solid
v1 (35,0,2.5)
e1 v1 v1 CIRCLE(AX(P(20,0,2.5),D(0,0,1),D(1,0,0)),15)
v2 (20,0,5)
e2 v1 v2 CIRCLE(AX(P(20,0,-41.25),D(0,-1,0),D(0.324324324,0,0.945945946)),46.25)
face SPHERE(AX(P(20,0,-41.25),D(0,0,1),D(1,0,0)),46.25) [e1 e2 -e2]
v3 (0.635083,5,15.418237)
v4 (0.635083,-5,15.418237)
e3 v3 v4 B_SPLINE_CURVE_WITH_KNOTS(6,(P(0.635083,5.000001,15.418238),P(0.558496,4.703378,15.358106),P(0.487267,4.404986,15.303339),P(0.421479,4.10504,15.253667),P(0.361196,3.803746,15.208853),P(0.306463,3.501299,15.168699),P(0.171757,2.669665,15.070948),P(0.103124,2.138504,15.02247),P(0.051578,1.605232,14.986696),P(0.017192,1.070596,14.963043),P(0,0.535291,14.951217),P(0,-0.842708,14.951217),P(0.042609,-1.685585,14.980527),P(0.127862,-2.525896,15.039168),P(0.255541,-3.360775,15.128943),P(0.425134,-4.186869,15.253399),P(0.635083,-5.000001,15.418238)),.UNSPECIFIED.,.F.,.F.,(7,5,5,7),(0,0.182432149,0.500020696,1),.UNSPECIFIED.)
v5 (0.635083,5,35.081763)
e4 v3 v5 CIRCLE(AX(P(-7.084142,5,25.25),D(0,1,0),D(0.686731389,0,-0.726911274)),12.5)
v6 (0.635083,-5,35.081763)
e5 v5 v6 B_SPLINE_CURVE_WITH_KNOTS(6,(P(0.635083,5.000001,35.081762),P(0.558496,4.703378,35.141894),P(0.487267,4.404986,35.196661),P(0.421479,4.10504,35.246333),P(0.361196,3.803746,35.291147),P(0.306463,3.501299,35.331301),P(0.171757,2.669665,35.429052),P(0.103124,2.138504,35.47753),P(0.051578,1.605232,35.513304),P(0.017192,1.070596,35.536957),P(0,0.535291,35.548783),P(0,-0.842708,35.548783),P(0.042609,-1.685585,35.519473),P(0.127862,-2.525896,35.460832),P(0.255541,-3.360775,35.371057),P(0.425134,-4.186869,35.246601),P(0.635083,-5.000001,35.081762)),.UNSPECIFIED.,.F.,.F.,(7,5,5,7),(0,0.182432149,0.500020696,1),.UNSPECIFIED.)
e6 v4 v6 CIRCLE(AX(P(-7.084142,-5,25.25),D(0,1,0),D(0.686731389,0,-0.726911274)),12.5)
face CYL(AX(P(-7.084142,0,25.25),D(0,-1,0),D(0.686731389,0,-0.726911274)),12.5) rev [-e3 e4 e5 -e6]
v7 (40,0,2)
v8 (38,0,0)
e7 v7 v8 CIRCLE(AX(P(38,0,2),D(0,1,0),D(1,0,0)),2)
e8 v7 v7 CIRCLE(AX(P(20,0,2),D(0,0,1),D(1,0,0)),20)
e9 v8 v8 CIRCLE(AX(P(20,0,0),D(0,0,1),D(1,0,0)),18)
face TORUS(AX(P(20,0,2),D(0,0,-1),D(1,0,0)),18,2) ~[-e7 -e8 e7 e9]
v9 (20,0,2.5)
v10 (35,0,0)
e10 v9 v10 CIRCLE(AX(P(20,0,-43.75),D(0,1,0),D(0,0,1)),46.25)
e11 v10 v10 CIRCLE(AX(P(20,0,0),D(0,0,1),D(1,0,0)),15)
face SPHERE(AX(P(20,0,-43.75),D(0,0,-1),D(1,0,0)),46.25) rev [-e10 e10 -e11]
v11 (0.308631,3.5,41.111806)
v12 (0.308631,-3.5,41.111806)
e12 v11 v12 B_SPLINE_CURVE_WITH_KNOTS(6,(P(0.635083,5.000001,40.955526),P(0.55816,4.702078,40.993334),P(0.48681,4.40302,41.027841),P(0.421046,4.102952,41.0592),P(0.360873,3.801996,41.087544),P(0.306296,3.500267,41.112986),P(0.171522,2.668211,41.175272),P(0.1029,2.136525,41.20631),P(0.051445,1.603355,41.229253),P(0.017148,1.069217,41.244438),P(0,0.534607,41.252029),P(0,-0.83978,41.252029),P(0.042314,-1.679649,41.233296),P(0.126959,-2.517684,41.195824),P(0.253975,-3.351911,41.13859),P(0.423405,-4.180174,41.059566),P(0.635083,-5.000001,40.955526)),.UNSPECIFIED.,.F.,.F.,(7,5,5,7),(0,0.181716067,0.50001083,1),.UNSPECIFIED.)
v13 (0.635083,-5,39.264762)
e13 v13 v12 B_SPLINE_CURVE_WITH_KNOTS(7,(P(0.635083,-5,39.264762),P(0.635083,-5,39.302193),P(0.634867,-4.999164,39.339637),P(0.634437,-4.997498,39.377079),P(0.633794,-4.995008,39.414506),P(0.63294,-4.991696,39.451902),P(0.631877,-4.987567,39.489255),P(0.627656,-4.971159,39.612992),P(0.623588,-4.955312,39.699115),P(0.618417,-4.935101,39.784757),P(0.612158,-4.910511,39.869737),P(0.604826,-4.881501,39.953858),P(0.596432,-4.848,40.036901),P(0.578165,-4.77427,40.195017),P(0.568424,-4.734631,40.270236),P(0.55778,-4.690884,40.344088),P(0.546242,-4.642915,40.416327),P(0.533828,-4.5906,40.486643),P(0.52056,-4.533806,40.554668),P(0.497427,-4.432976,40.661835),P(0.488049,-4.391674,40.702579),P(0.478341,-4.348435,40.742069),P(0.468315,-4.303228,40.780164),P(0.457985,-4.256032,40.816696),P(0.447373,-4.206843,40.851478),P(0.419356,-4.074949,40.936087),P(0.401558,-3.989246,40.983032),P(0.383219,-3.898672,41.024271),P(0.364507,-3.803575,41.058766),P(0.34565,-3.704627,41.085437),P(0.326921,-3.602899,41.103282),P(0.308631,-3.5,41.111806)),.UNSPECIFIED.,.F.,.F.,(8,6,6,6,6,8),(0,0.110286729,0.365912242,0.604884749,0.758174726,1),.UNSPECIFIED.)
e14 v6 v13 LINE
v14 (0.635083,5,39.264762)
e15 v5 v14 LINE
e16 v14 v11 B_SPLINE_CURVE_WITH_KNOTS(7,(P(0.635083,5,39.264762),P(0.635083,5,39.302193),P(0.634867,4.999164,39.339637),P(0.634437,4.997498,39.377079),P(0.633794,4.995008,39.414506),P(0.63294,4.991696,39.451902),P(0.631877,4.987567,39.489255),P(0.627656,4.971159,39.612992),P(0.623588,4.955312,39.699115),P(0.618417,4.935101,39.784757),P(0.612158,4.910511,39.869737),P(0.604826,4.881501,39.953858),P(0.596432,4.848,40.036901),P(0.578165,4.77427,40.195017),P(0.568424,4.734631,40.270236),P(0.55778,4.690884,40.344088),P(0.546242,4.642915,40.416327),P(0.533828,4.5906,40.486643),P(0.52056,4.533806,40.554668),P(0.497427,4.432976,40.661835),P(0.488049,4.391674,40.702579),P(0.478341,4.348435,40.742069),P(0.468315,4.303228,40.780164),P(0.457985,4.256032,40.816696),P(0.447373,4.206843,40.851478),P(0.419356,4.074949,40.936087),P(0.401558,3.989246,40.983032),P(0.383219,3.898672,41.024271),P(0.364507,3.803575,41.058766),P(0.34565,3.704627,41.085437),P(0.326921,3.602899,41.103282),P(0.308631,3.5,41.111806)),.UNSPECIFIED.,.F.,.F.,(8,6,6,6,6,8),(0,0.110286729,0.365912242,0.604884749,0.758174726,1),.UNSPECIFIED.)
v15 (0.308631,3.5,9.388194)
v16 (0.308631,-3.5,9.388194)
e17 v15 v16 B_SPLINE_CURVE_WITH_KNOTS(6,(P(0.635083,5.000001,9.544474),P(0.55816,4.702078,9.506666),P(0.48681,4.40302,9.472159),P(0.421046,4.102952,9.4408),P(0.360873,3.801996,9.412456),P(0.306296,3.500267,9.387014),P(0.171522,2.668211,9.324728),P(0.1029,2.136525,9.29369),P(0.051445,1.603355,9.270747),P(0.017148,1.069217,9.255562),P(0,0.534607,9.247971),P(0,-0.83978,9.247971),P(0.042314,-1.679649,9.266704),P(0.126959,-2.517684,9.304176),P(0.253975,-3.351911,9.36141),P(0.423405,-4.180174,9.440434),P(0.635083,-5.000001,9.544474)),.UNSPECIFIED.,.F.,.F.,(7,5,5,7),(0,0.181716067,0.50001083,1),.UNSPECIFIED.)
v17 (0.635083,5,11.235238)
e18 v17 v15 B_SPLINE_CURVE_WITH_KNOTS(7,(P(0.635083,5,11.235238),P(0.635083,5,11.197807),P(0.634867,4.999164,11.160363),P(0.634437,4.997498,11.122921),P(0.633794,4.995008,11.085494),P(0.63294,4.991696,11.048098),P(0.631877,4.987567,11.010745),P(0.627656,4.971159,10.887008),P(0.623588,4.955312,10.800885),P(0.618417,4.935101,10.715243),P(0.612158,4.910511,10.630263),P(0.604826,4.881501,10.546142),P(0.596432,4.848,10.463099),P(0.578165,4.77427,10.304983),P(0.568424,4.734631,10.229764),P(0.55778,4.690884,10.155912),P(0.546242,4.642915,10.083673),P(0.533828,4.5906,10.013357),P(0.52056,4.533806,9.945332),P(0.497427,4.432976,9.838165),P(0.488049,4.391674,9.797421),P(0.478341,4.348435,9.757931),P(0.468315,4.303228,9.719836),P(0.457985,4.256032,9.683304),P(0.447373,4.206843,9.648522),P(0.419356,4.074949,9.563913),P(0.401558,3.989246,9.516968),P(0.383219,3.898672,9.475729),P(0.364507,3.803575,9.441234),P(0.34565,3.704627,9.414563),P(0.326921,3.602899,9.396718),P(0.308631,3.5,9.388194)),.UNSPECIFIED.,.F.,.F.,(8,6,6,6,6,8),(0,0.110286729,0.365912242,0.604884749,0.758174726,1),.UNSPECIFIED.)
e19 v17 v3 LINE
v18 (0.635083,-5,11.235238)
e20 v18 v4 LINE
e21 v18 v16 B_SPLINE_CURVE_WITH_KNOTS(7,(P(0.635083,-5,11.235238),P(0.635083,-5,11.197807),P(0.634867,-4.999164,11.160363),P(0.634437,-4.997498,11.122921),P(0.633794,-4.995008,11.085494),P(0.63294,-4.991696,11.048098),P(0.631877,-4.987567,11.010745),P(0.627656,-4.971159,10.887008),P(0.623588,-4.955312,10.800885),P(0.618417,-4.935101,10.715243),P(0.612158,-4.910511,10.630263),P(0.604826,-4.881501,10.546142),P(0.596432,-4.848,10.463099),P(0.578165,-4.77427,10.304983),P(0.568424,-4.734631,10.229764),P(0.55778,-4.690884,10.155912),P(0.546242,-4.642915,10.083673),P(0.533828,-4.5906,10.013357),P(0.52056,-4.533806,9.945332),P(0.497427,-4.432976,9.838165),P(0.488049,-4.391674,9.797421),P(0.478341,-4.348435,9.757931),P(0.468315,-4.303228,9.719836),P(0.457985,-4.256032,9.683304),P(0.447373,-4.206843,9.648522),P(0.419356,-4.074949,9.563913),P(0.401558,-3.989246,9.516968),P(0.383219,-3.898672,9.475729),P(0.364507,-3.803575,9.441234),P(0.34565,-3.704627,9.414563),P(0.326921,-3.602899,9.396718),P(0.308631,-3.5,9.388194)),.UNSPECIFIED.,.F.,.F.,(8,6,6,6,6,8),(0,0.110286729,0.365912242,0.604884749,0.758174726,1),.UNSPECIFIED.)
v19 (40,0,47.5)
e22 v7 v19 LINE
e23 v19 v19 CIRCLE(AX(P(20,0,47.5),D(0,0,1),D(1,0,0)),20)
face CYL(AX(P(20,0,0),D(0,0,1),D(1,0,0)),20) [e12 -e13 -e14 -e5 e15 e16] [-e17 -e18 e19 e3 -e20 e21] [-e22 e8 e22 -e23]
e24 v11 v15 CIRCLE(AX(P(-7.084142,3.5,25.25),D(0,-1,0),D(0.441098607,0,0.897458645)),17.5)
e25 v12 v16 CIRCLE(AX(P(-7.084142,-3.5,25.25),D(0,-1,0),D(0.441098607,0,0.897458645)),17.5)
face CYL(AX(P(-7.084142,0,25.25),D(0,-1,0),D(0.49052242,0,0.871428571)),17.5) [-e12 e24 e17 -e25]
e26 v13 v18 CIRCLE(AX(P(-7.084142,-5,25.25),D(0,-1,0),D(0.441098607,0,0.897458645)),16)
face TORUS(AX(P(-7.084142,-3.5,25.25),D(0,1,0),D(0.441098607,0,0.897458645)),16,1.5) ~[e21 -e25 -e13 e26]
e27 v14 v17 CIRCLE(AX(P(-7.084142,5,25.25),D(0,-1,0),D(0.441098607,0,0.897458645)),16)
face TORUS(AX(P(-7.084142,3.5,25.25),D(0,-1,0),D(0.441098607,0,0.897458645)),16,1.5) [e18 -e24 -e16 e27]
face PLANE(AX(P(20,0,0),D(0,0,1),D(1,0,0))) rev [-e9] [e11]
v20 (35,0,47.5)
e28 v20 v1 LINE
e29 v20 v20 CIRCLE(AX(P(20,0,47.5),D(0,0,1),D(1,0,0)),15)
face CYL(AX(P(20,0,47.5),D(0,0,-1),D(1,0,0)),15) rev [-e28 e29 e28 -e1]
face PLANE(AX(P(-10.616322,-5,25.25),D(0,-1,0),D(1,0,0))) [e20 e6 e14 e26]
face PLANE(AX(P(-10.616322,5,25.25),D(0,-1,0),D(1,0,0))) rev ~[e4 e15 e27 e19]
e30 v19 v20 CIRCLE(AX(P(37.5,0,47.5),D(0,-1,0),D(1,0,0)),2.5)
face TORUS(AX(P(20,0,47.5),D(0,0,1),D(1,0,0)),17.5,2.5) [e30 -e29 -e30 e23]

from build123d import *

# Parameters (mm, degrees)
F3_DEPTH = 5
F4_R     = 1.5
F5_R     = 2


# Not quite as in the source:
# - a feature names something its author has since deleted; it is built from what else it names


with BuildPart() as f1:
    # F0 (on Front) → F1 (revolve)
    with BuildSketch(Plane.XZ):
        Polygon((35, 0), (40, 0), (40, 47.5), (35, 47.5), (35, 2.5), align=None)
        with BuildLine():
            Line((35, 47.5), (40, 47.5))
            ThreePointArc((40, 47.5), (37.5, 50), (35, 47.5))
        make_face()
        with BuildLine():
            ThreePointArc((20, 2.5), (27.6034531629, 1.8707189772), (35, 0))
            Line((35, 0), (35, 2.5))
            ThreePointArc((35, 2.5), (27.6034531629, 4.3707189772), (20, 5))
            Line((20, 5), (20, 2.5))
        make_face()
    revolve(axis=Axis((20, 0, 1.25), (0, 0, 1)))

    # F2 (on Front) → F3 (join, symmetric)
    with BuildSketch(Plane.XZ):
        with BuildLine():
            ThreePointArc((1.5, 16.1636090773), (-19.5841423567, 25.25), (1.5, 34.3363909227))
            Line((1.5, 34.3363909227), (1.5, 40.5))
            ThreePointArc((1.5, 40.5), (-24.5841423567, 25.25), (1.5, 10))
            Line((1.5, 10), (1.5, 16.1636090773))
        make_face()
    extrude(amount=F3_DEPTH, both=True)

    # F4
    f4_edges = [f1.edges().sort_by_distance(p)[0] for p in [
        (-24.584142, 5, 25.25),
        (-24.584142, -5, 25.25),
    ]]
    fillet(f4_edges, radius=F4_R)

    # F5
    f5_edges = [f1.edges().sort_by_distance(p)[0] for p in [
        (0, 0, 0),
    ]]
    fillet(f5_edges, radius=F5_R)


solid = f1.part
